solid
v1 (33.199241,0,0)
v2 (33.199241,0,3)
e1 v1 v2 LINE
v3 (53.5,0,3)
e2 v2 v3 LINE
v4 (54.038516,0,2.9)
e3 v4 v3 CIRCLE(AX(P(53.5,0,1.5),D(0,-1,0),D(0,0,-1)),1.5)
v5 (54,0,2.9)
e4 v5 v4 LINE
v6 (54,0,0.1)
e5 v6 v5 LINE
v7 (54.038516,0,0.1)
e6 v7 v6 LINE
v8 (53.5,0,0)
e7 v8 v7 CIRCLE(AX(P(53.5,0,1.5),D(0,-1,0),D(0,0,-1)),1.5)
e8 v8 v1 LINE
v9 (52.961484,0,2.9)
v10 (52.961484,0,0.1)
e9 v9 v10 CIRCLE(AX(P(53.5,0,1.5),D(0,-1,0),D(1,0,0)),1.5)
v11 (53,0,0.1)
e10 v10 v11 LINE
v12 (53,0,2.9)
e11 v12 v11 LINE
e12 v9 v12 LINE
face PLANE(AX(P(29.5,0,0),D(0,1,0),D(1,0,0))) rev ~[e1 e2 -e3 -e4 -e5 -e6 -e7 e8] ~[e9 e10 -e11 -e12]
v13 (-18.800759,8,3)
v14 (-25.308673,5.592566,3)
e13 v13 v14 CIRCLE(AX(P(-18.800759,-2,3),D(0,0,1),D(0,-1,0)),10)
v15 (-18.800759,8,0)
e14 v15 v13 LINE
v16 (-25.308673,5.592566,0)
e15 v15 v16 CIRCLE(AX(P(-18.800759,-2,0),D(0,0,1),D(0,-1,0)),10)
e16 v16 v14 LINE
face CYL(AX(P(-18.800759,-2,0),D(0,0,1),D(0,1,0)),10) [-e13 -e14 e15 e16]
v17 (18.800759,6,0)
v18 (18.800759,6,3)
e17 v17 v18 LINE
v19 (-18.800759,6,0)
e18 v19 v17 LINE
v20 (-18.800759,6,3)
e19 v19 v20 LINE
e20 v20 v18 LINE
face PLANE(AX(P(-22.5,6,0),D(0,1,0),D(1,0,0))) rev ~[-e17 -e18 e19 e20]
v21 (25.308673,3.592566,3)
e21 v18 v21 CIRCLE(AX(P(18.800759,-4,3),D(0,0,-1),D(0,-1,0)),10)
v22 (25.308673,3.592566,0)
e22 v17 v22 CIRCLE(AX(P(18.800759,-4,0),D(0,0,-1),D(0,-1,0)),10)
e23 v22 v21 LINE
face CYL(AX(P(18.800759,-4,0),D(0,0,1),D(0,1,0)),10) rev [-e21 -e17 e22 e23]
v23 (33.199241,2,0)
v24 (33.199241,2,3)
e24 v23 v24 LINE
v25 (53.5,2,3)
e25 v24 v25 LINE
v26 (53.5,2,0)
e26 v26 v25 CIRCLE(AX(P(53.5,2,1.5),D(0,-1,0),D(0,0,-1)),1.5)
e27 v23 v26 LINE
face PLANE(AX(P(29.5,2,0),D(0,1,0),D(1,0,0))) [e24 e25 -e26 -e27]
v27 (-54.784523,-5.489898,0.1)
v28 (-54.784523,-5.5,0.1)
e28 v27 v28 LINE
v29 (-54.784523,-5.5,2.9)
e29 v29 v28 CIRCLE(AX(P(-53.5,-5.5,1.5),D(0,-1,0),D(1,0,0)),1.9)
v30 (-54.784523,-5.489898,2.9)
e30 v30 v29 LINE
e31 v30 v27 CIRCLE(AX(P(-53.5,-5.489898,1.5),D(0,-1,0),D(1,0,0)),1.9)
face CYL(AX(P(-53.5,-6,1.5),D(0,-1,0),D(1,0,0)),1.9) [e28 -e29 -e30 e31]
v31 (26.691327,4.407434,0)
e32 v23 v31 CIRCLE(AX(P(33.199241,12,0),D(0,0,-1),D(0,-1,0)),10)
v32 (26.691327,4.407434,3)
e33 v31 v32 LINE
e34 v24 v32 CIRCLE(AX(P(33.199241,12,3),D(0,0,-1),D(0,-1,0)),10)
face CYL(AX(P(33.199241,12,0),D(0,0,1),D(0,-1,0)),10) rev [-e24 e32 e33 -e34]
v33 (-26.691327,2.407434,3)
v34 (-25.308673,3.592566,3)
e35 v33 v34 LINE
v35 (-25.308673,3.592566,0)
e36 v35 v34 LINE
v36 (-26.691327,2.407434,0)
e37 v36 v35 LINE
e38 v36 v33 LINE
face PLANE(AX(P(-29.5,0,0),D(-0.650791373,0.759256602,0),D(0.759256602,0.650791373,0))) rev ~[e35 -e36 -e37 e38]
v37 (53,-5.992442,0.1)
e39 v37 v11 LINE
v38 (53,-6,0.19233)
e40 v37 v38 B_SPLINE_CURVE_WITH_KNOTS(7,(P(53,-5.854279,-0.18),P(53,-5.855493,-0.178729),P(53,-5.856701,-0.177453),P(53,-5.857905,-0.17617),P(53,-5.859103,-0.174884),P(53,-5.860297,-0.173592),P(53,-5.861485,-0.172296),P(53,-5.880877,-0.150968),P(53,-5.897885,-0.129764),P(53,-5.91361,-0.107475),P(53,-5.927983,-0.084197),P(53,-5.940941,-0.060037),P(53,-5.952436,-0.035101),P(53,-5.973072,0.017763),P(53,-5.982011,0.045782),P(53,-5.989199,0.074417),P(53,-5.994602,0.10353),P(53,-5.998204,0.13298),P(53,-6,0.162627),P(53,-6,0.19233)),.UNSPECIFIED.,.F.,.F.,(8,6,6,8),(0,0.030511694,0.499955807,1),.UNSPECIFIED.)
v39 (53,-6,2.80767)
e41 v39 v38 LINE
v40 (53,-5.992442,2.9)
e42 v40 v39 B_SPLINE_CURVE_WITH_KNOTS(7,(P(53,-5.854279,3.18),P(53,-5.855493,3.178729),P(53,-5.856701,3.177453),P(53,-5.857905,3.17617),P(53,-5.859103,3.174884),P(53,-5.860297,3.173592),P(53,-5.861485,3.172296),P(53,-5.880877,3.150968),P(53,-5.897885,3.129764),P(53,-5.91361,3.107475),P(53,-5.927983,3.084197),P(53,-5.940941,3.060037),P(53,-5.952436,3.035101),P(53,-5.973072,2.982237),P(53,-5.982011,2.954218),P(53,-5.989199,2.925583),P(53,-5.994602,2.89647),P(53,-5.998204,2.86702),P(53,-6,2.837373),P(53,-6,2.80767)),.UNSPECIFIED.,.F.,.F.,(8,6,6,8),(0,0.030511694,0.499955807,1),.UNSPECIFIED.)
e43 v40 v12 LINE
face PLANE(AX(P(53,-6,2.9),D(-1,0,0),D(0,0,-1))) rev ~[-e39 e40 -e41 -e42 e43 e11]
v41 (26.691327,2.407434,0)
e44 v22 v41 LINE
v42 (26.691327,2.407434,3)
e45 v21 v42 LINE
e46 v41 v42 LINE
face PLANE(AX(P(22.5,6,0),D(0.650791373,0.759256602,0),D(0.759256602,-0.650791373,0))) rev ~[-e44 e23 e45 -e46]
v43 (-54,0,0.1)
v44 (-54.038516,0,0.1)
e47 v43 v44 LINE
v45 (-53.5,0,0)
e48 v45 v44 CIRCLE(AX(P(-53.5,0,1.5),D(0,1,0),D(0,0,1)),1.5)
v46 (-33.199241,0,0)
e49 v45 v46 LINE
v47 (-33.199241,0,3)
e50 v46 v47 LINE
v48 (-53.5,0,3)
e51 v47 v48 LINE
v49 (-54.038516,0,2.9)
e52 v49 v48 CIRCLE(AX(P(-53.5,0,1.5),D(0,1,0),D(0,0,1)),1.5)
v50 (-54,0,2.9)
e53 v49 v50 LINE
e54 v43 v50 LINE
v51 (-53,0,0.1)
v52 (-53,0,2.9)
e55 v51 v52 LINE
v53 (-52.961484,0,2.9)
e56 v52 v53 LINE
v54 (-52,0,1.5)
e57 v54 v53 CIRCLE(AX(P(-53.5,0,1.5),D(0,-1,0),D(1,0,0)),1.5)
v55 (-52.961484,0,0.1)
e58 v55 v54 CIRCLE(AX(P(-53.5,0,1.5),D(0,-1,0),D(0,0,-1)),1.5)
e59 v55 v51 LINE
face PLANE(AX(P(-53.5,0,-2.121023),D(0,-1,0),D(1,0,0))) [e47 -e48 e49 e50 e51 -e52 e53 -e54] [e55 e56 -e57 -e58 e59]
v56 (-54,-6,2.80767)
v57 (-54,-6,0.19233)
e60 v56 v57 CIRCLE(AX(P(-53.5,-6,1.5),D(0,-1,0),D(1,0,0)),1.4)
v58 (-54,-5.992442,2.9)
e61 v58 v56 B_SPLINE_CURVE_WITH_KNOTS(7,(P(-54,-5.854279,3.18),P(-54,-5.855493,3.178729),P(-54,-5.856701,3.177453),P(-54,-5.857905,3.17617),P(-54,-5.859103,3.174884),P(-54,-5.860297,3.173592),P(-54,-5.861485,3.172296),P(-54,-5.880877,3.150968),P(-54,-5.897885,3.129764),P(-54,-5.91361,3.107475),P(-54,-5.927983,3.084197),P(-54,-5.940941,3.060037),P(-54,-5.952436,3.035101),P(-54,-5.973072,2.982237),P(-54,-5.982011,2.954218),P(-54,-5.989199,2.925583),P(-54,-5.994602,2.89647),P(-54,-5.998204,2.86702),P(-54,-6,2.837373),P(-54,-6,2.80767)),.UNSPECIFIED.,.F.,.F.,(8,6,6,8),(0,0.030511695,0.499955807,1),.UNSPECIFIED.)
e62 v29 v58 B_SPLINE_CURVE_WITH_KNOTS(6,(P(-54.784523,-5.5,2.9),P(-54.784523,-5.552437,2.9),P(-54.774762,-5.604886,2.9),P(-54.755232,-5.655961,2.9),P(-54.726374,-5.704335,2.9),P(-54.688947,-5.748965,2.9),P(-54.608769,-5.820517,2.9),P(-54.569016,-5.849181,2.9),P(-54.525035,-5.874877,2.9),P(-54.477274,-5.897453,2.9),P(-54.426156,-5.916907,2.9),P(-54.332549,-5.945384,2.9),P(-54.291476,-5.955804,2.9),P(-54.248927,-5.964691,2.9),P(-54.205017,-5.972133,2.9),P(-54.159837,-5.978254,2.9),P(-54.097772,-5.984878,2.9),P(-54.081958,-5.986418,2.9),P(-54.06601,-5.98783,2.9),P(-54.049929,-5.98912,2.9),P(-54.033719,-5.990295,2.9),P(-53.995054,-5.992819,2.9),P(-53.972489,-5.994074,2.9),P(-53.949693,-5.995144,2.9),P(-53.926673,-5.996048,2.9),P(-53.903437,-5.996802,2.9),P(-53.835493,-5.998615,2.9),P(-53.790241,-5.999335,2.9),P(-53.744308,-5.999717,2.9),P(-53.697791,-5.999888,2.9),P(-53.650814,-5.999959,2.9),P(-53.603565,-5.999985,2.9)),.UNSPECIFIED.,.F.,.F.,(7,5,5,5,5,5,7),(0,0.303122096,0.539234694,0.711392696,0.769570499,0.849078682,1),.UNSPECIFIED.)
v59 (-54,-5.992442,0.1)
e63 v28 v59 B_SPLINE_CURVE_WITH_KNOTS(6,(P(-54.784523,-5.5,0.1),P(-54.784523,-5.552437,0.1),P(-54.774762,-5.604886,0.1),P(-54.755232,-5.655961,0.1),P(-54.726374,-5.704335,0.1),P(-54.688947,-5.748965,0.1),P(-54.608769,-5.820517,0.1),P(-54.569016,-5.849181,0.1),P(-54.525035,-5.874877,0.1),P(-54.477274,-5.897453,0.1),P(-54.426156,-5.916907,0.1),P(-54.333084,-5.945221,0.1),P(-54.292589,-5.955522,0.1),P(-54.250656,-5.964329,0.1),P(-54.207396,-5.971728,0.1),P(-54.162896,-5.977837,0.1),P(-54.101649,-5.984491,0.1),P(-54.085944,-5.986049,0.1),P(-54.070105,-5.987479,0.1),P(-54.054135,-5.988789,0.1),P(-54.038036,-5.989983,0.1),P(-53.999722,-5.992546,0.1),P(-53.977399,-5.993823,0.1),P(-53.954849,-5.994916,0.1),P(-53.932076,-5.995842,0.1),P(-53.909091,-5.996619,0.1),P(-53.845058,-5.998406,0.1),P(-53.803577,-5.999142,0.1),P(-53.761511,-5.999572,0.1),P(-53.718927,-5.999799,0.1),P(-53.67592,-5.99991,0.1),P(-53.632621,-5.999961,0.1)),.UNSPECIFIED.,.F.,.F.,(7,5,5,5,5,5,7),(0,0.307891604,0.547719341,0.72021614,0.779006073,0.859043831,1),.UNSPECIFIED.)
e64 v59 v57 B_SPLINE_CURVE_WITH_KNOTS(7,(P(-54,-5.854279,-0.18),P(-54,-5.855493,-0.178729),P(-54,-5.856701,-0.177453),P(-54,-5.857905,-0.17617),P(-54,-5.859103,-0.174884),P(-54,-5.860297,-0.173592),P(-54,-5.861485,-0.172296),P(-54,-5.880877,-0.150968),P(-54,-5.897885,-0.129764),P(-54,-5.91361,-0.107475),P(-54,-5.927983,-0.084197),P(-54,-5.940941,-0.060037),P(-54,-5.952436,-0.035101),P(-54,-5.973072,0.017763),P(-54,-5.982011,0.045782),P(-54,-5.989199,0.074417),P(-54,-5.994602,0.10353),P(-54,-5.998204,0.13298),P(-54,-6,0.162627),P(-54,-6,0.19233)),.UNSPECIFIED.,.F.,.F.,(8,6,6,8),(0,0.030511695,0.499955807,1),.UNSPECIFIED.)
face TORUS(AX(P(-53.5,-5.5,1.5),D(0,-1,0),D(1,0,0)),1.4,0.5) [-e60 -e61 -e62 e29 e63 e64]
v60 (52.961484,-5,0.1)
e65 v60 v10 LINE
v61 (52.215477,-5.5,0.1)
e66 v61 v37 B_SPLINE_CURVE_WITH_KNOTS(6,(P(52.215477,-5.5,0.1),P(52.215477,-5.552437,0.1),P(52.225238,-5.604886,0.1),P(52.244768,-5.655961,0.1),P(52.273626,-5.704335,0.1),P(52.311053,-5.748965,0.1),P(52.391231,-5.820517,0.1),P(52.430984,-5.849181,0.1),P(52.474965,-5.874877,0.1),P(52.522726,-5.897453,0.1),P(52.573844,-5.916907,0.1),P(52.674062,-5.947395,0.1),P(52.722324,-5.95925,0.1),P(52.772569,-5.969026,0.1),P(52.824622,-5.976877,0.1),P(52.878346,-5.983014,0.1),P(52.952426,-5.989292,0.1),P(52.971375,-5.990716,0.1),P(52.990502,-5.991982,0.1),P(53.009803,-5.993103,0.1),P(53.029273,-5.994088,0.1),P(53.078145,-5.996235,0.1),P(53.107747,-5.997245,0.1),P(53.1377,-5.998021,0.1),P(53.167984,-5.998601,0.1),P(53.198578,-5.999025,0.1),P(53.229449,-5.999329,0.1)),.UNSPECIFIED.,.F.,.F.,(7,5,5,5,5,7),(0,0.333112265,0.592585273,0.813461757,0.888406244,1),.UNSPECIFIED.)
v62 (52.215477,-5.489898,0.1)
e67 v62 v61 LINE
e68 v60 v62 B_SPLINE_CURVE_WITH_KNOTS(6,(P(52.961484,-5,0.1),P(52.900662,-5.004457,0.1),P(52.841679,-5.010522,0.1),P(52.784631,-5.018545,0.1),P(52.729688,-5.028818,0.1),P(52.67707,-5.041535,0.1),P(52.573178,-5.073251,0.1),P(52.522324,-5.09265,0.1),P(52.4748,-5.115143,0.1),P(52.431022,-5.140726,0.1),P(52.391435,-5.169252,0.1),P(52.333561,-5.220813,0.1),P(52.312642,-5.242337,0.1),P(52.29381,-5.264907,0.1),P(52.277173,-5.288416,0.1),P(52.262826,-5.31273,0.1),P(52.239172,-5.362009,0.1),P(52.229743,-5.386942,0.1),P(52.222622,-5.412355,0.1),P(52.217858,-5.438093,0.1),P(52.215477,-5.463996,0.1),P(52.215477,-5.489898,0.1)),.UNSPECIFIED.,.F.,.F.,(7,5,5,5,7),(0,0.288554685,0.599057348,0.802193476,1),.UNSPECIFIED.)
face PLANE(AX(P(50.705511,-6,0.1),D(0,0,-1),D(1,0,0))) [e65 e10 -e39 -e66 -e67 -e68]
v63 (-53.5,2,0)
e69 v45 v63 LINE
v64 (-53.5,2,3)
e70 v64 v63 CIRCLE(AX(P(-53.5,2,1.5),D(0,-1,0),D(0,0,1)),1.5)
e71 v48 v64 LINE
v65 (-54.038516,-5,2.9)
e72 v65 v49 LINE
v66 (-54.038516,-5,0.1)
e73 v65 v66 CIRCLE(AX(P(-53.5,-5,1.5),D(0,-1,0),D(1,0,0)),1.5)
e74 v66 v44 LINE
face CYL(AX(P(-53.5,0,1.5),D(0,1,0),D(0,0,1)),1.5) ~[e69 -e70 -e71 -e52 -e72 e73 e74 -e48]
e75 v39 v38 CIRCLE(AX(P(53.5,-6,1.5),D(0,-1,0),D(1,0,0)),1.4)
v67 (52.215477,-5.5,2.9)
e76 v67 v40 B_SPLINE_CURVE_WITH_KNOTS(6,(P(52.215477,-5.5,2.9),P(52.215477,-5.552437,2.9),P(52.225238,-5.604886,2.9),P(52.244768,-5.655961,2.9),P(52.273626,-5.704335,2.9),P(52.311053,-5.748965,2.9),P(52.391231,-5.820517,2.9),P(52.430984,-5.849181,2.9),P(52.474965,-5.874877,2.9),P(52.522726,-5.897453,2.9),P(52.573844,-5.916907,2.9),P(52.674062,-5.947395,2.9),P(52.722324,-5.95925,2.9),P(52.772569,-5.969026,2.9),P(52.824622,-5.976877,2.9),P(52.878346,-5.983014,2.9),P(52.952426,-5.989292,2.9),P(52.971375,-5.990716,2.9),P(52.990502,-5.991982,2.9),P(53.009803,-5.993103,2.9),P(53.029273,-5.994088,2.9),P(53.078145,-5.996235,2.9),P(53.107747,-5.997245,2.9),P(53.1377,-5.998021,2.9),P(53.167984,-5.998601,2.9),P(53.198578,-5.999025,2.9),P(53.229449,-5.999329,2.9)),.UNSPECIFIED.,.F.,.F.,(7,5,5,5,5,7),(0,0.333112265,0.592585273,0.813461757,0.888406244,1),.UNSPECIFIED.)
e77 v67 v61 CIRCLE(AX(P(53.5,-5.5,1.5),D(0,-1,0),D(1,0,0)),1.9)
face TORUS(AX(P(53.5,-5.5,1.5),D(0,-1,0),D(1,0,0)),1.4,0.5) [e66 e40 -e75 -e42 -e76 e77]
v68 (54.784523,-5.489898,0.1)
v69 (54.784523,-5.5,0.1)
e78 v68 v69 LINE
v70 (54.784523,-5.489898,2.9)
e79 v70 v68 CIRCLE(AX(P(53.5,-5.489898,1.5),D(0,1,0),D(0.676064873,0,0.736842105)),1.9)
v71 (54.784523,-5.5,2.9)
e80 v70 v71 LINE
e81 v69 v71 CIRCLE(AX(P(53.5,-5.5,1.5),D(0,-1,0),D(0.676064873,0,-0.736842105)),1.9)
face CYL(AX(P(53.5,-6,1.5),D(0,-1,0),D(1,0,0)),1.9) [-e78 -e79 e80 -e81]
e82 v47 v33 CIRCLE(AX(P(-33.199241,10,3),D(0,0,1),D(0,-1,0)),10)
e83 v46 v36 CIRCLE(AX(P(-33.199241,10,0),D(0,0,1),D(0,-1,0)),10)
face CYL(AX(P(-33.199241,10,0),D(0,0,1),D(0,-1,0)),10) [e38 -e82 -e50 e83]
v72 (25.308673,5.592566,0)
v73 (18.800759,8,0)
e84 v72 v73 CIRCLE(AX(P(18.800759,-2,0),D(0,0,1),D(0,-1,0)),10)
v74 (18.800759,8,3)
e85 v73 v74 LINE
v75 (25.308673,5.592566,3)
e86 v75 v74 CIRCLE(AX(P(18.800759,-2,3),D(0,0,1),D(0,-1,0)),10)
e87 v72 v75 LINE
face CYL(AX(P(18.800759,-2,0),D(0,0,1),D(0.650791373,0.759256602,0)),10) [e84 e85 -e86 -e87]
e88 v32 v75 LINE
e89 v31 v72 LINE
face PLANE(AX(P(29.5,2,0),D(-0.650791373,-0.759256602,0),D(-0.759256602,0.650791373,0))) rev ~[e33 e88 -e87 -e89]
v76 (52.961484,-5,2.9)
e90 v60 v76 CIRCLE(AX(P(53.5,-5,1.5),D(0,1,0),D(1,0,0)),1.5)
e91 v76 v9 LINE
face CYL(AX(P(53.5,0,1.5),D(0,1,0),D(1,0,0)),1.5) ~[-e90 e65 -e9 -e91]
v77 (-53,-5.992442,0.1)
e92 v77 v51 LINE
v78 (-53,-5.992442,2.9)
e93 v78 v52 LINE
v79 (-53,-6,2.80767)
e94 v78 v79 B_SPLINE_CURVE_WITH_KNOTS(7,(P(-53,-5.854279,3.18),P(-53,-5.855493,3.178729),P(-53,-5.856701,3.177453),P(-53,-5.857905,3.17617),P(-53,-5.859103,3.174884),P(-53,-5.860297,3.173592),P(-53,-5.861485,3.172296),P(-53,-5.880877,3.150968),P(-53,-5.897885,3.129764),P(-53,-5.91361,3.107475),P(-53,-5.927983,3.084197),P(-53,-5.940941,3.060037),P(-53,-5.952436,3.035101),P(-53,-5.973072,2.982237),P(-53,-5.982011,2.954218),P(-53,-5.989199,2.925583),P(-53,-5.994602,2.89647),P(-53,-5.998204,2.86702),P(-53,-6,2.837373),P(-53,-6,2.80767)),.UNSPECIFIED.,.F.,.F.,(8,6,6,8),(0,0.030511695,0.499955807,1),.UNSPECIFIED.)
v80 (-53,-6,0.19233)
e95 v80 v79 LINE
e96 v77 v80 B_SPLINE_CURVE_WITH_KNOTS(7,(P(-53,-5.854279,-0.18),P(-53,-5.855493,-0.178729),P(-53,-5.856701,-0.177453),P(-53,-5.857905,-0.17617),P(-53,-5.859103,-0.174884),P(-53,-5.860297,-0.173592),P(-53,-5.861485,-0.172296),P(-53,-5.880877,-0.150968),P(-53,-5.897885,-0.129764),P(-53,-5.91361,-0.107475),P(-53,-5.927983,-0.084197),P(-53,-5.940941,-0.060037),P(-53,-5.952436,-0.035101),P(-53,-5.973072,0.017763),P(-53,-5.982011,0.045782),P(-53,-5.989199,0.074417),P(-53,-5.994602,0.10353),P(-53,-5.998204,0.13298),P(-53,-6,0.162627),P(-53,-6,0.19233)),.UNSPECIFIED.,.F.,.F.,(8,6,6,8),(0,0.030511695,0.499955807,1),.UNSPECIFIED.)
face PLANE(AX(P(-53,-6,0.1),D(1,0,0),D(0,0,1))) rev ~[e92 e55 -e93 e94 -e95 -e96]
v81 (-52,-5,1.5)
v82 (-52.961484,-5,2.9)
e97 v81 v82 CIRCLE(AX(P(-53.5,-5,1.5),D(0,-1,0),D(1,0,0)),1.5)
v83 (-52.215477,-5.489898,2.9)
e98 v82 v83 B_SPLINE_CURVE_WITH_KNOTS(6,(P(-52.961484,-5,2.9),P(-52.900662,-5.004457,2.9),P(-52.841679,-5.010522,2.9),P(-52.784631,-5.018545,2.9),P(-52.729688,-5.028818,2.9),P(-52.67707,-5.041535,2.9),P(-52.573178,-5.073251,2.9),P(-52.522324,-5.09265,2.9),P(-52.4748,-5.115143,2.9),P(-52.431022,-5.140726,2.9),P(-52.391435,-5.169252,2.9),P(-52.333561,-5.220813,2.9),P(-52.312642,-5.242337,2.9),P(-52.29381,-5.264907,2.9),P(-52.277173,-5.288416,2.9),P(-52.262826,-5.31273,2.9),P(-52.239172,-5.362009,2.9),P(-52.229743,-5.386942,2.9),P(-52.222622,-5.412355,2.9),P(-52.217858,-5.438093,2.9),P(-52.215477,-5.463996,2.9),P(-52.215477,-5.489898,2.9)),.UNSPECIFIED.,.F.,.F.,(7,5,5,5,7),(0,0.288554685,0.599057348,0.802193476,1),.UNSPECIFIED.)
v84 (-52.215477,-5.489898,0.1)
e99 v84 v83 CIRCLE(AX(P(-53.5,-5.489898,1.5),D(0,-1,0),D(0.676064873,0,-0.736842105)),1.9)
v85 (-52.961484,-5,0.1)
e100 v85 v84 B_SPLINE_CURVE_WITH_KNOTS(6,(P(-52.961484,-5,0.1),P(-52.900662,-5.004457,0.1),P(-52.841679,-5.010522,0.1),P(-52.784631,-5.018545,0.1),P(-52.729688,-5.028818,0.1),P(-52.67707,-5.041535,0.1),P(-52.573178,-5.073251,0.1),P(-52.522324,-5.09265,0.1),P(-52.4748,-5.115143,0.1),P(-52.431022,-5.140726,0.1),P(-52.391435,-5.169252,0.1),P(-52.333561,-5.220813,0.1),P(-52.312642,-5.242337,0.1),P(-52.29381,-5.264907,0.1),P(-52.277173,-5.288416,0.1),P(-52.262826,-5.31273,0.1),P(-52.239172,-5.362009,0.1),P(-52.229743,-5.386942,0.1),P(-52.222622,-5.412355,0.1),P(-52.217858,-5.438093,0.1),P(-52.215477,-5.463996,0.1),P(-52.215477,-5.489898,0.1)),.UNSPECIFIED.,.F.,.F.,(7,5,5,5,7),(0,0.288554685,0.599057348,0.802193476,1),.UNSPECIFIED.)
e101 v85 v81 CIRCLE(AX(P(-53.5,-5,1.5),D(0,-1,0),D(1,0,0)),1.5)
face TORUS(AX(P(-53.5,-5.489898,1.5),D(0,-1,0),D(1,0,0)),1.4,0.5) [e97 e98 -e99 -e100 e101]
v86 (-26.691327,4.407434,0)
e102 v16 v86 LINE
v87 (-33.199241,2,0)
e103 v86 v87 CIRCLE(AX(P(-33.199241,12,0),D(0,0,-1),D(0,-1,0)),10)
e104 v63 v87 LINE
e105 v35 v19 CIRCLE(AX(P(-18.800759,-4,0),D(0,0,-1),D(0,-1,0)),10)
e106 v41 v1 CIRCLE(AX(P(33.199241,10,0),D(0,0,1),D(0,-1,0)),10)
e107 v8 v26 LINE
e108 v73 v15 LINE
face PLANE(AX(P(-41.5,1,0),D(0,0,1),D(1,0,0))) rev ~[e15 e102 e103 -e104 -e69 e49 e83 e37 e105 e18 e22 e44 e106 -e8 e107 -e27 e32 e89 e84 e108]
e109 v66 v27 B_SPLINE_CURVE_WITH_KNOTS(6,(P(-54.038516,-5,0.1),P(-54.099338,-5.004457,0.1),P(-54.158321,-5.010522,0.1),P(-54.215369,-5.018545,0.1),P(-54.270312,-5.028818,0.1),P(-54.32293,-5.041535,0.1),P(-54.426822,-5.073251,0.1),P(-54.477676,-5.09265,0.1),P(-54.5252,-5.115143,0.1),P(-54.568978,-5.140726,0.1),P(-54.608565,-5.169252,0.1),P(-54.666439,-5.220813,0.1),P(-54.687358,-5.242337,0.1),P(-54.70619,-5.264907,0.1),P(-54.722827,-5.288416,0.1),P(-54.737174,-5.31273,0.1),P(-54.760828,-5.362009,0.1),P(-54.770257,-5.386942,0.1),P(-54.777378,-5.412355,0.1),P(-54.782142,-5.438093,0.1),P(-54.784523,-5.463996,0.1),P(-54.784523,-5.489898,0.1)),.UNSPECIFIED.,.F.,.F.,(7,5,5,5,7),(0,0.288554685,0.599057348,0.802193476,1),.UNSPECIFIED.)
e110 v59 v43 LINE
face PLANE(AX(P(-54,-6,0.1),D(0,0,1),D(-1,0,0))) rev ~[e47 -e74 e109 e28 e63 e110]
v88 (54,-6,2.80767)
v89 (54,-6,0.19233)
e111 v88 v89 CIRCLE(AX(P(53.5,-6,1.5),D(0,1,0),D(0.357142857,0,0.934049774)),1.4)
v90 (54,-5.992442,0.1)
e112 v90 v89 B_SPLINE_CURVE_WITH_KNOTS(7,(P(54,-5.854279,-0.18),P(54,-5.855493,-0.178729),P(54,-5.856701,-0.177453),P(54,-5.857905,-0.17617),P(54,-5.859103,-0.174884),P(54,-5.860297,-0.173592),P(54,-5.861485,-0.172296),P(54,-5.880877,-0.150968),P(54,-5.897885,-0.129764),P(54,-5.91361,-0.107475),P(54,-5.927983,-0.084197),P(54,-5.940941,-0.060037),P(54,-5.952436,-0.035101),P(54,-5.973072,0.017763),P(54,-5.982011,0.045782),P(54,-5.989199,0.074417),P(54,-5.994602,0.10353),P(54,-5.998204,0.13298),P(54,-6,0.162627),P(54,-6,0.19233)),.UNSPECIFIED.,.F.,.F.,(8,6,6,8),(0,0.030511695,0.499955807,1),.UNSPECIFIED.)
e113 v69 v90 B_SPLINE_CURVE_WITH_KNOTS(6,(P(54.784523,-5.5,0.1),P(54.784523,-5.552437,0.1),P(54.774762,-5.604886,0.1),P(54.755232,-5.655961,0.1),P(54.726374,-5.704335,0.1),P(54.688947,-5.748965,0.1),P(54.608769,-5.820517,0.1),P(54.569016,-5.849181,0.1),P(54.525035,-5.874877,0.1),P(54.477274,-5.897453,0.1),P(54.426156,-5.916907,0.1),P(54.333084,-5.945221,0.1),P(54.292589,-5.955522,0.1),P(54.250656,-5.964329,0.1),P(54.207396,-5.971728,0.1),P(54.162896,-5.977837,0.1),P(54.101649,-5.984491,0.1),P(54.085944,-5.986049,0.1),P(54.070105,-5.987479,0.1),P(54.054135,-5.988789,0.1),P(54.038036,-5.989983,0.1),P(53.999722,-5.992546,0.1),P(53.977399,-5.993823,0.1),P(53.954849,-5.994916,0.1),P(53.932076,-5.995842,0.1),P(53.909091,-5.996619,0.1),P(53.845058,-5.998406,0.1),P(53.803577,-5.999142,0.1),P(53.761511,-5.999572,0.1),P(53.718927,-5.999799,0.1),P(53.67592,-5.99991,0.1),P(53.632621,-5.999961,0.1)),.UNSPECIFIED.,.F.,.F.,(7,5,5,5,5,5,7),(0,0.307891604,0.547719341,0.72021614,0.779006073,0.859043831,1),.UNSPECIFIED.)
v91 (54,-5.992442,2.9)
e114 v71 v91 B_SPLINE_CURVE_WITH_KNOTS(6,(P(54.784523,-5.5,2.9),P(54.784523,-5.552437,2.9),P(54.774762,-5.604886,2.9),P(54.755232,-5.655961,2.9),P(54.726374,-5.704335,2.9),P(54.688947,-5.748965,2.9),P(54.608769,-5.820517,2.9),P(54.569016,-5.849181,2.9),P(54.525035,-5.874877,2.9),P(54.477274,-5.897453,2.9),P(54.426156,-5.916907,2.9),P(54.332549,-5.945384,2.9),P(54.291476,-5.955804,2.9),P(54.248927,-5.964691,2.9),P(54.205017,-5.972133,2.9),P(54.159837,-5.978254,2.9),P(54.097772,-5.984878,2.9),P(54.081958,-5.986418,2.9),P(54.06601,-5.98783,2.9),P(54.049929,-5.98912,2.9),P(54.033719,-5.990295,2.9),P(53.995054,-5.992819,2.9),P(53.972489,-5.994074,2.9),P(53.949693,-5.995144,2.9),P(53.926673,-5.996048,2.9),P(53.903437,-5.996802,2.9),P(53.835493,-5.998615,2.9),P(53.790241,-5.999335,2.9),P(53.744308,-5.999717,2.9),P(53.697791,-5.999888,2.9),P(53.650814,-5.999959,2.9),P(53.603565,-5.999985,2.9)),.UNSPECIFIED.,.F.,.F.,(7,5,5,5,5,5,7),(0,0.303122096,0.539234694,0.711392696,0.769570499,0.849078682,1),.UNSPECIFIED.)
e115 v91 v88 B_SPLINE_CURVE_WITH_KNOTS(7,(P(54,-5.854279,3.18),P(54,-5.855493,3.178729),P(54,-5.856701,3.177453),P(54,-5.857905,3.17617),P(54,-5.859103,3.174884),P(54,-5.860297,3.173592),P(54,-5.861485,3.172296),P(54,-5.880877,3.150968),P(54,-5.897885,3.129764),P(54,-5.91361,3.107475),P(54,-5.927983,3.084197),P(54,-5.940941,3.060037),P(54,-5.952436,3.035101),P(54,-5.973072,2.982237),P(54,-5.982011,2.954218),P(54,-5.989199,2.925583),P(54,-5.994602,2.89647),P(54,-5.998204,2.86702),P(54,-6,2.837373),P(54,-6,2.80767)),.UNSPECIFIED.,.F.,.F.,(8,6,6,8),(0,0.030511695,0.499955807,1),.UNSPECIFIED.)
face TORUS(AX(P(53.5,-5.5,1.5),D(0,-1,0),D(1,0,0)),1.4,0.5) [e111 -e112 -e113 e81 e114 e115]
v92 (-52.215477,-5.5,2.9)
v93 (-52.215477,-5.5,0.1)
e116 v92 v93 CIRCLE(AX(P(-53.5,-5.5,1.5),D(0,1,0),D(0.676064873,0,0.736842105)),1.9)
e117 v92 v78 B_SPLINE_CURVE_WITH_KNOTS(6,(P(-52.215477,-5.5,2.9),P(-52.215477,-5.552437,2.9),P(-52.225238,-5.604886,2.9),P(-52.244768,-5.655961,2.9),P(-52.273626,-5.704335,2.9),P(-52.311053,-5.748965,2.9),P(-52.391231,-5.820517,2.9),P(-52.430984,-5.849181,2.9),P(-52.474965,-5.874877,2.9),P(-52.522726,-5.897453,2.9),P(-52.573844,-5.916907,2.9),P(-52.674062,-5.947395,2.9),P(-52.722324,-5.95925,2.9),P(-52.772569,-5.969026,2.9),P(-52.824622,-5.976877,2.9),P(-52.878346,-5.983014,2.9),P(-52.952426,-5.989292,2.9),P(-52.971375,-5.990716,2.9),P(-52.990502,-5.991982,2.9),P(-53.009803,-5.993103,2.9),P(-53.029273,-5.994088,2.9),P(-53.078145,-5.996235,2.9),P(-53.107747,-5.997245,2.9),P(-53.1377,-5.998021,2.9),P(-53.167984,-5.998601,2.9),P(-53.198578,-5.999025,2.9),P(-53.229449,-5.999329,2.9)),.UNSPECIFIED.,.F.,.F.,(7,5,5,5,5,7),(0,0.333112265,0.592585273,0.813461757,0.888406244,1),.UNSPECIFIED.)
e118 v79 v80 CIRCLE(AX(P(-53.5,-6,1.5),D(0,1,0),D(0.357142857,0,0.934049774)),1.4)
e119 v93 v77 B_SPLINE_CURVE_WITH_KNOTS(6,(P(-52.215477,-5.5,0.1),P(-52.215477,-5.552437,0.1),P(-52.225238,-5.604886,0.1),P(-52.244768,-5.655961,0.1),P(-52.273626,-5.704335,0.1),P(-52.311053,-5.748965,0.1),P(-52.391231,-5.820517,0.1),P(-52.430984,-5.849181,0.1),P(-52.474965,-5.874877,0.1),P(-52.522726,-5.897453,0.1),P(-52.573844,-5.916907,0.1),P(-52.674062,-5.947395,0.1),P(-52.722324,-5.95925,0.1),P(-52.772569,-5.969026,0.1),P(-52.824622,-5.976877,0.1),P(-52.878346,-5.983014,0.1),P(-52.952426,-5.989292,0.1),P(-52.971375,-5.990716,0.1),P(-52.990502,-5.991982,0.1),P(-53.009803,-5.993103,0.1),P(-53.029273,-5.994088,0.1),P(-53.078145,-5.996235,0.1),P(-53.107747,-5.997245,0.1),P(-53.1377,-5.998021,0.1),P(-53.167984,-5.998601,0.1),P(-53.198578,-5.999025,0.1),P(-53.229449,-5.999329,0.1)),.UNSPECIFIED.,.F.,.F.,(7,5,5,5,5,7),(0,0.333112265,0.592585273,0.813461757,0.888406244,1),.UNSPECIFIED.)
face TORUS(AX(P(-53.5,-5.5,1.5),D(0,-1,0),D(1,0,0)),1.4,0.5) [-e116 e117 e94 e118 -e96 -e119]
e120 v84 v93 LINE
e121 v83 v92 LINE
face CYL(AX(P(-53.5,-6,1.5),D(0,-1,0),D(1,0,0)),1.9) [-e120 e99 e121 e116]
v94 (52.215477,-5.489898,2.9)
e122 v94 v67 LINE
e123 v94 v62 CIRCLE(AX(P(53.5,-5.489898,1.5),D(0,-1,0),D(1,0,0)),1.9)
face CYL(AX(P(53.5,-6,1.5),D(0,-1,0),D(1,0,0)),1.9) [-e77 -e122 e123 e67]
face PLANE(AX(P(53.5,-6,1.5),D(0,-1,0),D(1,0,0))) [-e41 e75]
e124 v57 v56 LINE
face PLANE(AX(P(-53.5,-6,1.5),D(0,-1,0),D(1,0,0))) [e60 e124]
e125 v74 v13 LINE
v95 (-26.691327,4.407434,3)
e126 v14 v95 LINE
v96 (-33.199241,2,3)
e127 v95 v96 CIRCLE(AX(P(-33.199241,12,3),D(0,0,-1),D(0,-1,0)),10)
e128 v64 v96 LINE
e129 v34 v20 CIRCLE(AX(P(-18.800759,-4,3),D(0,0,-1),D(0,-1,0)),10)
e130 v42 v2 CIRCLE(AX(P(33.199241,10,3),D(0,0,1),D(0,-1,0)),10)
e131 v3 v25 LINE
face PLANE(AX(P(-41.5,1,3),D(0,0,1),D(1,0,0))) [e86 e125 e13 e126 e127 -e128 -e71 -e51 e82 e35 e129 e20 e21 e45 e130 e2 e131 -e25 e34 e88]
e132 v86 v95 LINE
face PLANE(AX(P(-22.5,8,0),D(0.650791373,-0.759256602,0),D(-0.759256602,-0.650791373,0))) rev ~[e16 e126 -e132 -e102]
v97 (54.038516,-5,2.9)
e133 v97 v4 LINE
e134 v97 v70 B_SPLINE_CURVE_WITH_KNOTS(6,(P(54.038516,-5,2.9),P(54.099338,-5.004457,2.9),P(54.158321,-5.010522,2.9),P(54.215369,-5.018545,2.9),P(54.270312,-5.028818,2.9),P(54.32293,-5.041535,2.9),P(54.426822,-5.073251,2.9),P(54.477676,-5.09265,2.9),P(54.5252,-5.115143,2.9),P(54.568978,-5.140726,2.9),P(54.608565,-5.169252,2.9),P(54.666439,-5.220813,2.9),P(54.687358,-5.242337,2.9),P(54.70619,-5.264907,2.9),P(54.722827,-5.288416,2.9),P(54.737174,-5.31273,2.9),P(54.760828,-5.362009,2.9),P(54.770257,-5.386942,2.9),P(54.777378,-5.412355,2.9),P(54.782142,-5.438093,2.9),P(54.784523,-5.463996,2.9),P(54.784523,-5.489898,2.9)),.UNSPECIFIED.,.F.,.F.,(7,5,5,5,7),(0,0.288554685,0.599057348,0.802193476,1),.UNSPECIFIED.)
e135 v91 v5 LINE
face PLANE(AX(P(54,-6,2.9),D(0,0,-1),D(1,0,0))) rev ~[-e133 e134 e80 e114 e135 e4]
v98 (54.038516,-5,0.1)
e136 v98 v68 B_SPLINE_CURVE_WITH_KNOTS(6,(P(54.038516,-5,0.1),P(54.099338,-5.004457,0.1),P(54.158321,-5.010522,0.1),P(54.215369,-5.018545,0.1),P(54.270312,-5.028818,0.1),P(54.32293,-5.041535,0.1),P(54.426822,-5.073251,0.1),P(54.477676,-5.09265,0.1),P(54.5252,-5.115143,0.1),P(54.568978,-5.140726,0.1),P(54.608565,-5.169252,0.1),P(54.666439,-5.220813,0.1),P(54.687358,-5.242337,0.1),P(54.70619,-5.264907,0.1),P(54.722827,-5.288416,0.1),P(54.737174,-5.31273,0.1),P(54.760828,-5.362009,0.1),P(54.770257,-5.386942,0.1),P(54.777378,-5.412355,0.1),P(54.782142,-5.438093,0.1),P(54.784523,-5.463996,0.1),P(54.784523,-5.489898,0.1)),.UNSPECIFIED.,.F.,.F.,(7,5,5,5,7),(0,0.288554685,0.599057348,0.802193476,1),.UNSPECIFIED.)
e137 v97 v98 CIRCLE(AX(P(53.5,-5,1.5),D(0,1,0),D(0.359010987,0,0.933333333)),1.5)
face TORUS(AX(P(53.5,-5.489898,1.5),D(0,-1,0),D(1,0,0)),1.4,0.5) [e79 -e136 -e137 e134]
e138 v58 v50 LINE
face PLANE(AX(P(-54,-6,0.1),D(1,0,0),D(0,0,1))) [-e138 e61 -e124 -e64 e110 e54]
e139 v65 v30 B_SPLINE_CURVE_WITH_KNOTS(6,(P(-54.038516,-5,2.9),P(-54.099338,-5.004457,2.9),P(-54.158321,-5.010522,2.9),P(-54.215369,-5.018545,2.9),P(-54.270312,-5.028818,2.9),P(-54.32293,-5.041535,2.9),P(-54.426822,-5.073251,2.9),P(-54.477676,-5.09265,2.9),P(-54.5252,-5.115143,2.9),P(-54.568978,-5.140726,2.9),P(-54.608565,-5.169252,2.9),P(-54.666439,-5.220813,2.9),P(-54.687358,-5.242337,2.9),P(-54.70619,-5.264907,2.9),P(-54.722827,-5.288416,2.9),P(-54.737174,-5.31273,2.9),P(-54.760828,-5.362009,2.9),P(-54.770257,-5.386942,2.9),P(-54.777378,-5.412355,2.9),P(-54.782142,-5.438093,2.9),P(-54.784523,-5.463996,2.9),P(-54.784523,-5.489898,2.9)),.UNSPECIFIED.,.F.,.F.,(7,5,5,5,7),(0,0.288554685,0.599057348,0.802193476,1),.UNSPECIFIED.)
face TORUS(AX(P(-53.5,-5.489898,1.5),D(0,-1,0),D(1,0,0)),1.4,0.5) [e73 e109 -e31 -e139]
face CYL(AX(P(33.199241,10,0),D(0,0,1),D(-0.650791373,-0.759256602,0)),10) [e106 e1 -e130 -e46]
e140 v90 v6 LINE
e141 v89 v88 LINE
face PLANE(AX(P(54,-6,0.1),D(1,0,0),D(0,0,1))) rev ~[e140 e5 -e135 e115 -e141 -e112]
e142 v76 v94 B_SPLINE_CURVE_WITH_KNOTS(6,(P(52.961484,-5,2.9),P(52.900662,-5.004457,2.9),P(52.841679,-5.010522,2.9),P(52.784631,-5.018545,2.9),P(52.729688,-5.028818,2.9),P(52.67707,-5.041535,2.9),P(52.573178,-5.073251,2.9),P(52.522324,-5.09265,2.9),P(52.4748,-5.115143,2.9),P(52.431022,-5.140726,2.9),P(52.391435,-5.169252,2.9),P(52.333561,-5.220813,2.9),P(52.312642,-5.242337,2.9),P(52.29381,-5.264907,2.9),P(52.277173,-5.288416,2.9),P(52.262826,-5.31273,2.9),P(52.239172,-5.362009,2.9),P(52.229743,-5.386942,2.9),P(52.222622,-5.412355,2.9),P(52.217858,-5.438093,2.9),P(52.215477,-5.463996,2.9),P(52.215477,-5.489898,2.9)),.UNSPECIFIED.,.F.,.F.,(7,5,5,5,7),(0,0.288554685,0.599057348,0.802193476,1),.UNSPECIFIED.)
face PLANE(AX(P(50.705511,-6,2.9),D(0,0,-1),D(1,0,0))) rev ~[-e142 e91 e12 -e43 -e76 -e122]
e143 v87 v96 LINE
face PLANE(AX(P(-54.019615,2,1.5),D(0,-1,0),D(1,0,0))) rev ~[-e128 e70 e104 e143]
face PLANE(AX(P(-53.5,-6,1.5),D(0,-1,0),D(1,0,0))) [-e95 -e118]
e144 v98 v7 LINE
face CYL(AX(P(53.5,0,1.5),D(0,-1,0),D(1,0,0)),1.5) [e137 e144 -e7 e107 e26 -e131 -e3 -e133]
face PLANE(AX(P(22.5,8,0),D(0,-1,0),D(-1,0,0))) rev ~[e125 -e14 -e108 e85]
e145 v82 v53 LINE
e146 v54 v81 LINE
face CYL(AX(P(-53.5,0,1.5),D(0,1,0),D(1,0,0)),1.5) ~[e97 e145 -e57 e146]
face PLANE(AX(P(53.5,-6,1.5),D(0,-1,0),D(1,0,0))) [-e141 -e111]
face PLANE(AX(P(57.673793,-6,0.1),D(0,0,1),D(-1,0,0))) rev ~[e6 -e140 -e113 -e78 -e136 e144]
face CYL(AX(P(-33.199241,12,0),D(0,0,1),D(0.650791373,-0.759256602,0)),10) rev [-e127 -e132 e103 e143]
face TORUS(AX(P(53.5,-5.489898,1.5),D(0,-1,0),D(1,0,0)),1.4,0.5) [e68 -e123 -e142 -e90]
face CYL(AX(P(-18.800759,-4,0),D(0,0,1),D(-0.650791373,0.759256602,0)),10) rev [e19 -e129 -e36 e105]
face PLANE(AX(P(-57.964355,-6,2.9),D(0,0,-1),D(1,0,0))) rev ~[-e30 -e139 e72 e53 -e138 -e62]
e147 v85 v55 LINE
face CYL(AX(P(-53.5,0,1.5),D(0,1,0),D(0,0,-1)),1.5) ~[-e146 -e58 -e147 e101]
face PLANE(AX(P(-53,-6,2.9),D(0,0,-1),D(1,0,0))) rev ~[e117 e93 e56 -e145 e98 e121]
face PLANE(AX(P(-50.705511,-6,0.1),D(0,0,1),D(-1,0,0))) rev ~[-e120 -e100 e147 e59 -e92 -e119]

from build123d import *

# Parameters (mm, degrees)
F0_W      = 24
F0_H      = 2
F0_W_2    = 22.5
F1_DEPTH  = 3
F2_R      = 10
F3_R      = 1.5
F4_DEPTH  = 2
F5_DEPTH  = 6
F6_R      = 1.9
F6_R_2    = 1.5
F7_DEPTH  = 1
F9_W      = 1
F9_H      = 3.4420455096
F9_W_2    = 3.6737932861
F9_H_2    = 0.5
F9_W_3    = 2.2944888771
F9_H_3    = 2.8
F9_W_4    = 3.9643547535
F10_DEPTH = 6


# Not quite as in the source:
# - a fillet or chamfer that OpenCascade refuses, or shapes differently, is made with other operations: its cross-section is extruded or revolved along the edge and cut away or added


with BuildPart() as f1:
    # F0 (on Top) → F1 (new body)
    with BuildSketch(Plane.XY):
        with Locations((-41.5, 1)):
            Rectangle(F0_W, F0_H)
        Polygon((-29.5, 2), (-29.5, 0), (-22.5, 6), (-22.5, 8), align=None)
        with Locations((-11.25, 7)):
            Rectangle(F0_W_2, F0_H)
        with Locations((11.25, 7)):
            Rectangle(F0_W_2, F0_H)
        Polygon((22.5, 8), (22.5, 6), (29.5, 0), (29.5, 2), align=None)
        with Locations((41.5, 1)):
            Rectangle(F0_W, F0_H)
    extrude(amount=F1_DEPTH)

    # F2
    f2_edges = [f1.edges().sort_by_distance(p)[0] for p in [
        (-29.5, 2, 1.5),
        (-22.5, 8, 1.5),
        (22.5, 8, 1.5),
        (29.5, 2, 1.5),
        (29.5, 0, 1.5),
        (22.5, 6, 1.5),
        (-22.5, 6, 1.5),
        (-29.5, 0, 1.5),
    ]]
    fillet(f2_edges, radius=F2_R)

    # F3 (on face) → F4 (join, through all)
    with BuildSketch(Plane.XZ):
        with BuildLine():
            Line((-53.5, 0), (-53.5, 3))
            ThreePointArc((-53.5, 3), (-55, 1.5), (-53.5, 0))
        make_face()
        with Locations((53.5, 1.5)):
            Circle(F3_R)
    extrude(amount=-F4_DEPTH)

    # F3 (on face) → F5 (join)
    with BuildSketch(Plane.XZ):
        with BuildLine():
            Line((-53.5, 0), (-53.5, 3))
            ThreePointArc((-53.5, 3), (-55, 1.5), (-53.5, 0))
        make_face()
        with BuildLine():
            ThreePointArc((-53.5, 0), (-52.4393398282, 0.4393398282), (-52, 1.5))
            ThreePointArc((-52, 1.5), (-52.4393398282, 2.5606601718), (-53.5, 3))
            Line((-53.5, 3), (-53.5, 0))
        make_face()
        with Locations((53.5, 1.5)):
            Circle(F3_R)
    extrude(amount=F5_DEPTH)

    # F6 (on face) → F7 (join)
    with BuildSketch(Plane.XZ.offset(6)):
        with Locations((-53.5, 1.5)):
            Circle(F6_R)
        with Locations((-53.5, 1.5)):
            Circle(F6_R_2, mode=Mode.SUBTRACT)
        with Locations((53.5, 1.5)):
            Circle(F6_R)
    extrude(amount=-F7_DEPTH)

    # F8: fillet of radius 0.5 on 4 edges, made by hand

    # F8_s1 → F8_t2 (revolve, cut)
    with BuildSketch(Plane.XY.offset(1.5)):
        with BuildLine():
            ThreePointArc((-51.6, -5.5), (-51.7464466094, -5.8535533906), (-52.1, -6))
            Line((-52.1, -6), (-51.6, -6))
            Line((-51.6, -6), (-51.6, -5.5))
        make_face()
    revolve(axis=Axis((-53.5, -6, 1.5), (0, -1, 0)), mode=Mode.SUBTRACT)

    # F8_s3 → F8_t4 (revolve, cut)
    with BuildSketch(Plane.XY.offset(1.5)):
        with BuildLine():
            ThreePointArc((-52, -5), (-51.7127016654, -5.1736701825), (-51.6, -5.4898979486))
            Line((-51.6, -5.4898979486), (-51.6, -5))
            Line((-51.6, -5), (-52, -5))
        make_face()
    revolve(axis=Axis((-53.5, -5, 1.5), (0, -1, 0)), mode=Mode.SUBTRACT)

    # F8_s5 → F8_t6 (revolve, cut)
    with BuildSketch(Plane.XY.offset(1.5)):
        with BuildLine():
            ThreePointArc((55, -5), (55.2872983346, -5.1736701825), (55.4, -5.4898979486))
            Line((55.4, -5.4898979486), (55.4, -5))
            Line((55.4, -5), (55, -5))
        make_face()
    revolve(axis=Axis((53.5, -5, 1.5), (0, -1, 0)), mode=Mode.SUBTRACT)

    # F8_s7 → F8_t8 (revolve, cut)
    with BuildSketch(Plane.XY.offset(1.5)):
        with BuildLine():
            ThreePointArc((55.4, -5.5), (55.2535533906, -5.8535533906), (54.9, -6))
            Line((54.9, -6), (55.4, -6))
            Line((55.4, -6), (55.4, -5.5))
        make_face()
    revolve(axis=Axis((53.5, -6, 1.5), (0, -1, 0)), mode=Mode.SUBTRACT)

    # F9 (on face) → F10 (cut, through all)
    with BuildSketch(Plane.XZ.offset(6)):
        with Locations((-53.5, -2.1210227548)):
            Rectangle(F9_W, F9_H)
        with Locations((-55.836896643, -0.15)):
            Rectangle(F9_W_2, F9_H_2)
        with Locations((-53.5, -0.15)):
            Rectangle(F9_W, F9_H_2)
        with Locations((-51.8527555615, -0.15)):
            Rectangle(F9_W_3, F9_H_2)
        with Locations((-53.5, 1.5)):
            Rectangle(F9_W, F9_H_3)
        with Locations((-55.9821773767, 3.15)):
            Rectangle(F9_W_4, F9_H_2)
        with Locations((-53.5, 3.15)):
            Rectangle(F9_W, F9_H_2)
        with Locations((-51.8527555615, 3.15)):
            Rectangle(F9_W_3, F9_H_2)
        with Locations((-53.5, 5.1210227548)):
            Rectangle(F9_W, F9_H)
        with Locations((55.836896643, -0.15)):
            Rectangle(F9_W_2, F9_H_2)
        with Locations((53.5, -2.1210227548)):
            Rectangle(F9_W, F9_H)
        with Locations((53.5, -0.15)):
            Rectangle(F9_W, F9_H_2)
        with Locations((53.5, 1.5)):
            Rectangle(F9_W, F9_H_3)
        with Locations((51.8527555615, -0.15)):
            Rectangle(F9_W_3, F9_H_2)
        with Locations((55.9821773767, 3.15)):
            Rectangle(F9_W_4, F9_H_2)
        with Locations((53.5, 3.15)):
            Rectangle(F9_W, F9_H_2)
        with Locations((51.8527555615, 3.15)):
            Rectangle(F9_W_3, F9_H_2)
        with Locations((53.5, 5.1210227548)):
            Rectangle(F9_W, F9_H)
    extrude(amount=-F10_DEPTH, mode=Mode.SUBTRACT)


solid = f1.part
